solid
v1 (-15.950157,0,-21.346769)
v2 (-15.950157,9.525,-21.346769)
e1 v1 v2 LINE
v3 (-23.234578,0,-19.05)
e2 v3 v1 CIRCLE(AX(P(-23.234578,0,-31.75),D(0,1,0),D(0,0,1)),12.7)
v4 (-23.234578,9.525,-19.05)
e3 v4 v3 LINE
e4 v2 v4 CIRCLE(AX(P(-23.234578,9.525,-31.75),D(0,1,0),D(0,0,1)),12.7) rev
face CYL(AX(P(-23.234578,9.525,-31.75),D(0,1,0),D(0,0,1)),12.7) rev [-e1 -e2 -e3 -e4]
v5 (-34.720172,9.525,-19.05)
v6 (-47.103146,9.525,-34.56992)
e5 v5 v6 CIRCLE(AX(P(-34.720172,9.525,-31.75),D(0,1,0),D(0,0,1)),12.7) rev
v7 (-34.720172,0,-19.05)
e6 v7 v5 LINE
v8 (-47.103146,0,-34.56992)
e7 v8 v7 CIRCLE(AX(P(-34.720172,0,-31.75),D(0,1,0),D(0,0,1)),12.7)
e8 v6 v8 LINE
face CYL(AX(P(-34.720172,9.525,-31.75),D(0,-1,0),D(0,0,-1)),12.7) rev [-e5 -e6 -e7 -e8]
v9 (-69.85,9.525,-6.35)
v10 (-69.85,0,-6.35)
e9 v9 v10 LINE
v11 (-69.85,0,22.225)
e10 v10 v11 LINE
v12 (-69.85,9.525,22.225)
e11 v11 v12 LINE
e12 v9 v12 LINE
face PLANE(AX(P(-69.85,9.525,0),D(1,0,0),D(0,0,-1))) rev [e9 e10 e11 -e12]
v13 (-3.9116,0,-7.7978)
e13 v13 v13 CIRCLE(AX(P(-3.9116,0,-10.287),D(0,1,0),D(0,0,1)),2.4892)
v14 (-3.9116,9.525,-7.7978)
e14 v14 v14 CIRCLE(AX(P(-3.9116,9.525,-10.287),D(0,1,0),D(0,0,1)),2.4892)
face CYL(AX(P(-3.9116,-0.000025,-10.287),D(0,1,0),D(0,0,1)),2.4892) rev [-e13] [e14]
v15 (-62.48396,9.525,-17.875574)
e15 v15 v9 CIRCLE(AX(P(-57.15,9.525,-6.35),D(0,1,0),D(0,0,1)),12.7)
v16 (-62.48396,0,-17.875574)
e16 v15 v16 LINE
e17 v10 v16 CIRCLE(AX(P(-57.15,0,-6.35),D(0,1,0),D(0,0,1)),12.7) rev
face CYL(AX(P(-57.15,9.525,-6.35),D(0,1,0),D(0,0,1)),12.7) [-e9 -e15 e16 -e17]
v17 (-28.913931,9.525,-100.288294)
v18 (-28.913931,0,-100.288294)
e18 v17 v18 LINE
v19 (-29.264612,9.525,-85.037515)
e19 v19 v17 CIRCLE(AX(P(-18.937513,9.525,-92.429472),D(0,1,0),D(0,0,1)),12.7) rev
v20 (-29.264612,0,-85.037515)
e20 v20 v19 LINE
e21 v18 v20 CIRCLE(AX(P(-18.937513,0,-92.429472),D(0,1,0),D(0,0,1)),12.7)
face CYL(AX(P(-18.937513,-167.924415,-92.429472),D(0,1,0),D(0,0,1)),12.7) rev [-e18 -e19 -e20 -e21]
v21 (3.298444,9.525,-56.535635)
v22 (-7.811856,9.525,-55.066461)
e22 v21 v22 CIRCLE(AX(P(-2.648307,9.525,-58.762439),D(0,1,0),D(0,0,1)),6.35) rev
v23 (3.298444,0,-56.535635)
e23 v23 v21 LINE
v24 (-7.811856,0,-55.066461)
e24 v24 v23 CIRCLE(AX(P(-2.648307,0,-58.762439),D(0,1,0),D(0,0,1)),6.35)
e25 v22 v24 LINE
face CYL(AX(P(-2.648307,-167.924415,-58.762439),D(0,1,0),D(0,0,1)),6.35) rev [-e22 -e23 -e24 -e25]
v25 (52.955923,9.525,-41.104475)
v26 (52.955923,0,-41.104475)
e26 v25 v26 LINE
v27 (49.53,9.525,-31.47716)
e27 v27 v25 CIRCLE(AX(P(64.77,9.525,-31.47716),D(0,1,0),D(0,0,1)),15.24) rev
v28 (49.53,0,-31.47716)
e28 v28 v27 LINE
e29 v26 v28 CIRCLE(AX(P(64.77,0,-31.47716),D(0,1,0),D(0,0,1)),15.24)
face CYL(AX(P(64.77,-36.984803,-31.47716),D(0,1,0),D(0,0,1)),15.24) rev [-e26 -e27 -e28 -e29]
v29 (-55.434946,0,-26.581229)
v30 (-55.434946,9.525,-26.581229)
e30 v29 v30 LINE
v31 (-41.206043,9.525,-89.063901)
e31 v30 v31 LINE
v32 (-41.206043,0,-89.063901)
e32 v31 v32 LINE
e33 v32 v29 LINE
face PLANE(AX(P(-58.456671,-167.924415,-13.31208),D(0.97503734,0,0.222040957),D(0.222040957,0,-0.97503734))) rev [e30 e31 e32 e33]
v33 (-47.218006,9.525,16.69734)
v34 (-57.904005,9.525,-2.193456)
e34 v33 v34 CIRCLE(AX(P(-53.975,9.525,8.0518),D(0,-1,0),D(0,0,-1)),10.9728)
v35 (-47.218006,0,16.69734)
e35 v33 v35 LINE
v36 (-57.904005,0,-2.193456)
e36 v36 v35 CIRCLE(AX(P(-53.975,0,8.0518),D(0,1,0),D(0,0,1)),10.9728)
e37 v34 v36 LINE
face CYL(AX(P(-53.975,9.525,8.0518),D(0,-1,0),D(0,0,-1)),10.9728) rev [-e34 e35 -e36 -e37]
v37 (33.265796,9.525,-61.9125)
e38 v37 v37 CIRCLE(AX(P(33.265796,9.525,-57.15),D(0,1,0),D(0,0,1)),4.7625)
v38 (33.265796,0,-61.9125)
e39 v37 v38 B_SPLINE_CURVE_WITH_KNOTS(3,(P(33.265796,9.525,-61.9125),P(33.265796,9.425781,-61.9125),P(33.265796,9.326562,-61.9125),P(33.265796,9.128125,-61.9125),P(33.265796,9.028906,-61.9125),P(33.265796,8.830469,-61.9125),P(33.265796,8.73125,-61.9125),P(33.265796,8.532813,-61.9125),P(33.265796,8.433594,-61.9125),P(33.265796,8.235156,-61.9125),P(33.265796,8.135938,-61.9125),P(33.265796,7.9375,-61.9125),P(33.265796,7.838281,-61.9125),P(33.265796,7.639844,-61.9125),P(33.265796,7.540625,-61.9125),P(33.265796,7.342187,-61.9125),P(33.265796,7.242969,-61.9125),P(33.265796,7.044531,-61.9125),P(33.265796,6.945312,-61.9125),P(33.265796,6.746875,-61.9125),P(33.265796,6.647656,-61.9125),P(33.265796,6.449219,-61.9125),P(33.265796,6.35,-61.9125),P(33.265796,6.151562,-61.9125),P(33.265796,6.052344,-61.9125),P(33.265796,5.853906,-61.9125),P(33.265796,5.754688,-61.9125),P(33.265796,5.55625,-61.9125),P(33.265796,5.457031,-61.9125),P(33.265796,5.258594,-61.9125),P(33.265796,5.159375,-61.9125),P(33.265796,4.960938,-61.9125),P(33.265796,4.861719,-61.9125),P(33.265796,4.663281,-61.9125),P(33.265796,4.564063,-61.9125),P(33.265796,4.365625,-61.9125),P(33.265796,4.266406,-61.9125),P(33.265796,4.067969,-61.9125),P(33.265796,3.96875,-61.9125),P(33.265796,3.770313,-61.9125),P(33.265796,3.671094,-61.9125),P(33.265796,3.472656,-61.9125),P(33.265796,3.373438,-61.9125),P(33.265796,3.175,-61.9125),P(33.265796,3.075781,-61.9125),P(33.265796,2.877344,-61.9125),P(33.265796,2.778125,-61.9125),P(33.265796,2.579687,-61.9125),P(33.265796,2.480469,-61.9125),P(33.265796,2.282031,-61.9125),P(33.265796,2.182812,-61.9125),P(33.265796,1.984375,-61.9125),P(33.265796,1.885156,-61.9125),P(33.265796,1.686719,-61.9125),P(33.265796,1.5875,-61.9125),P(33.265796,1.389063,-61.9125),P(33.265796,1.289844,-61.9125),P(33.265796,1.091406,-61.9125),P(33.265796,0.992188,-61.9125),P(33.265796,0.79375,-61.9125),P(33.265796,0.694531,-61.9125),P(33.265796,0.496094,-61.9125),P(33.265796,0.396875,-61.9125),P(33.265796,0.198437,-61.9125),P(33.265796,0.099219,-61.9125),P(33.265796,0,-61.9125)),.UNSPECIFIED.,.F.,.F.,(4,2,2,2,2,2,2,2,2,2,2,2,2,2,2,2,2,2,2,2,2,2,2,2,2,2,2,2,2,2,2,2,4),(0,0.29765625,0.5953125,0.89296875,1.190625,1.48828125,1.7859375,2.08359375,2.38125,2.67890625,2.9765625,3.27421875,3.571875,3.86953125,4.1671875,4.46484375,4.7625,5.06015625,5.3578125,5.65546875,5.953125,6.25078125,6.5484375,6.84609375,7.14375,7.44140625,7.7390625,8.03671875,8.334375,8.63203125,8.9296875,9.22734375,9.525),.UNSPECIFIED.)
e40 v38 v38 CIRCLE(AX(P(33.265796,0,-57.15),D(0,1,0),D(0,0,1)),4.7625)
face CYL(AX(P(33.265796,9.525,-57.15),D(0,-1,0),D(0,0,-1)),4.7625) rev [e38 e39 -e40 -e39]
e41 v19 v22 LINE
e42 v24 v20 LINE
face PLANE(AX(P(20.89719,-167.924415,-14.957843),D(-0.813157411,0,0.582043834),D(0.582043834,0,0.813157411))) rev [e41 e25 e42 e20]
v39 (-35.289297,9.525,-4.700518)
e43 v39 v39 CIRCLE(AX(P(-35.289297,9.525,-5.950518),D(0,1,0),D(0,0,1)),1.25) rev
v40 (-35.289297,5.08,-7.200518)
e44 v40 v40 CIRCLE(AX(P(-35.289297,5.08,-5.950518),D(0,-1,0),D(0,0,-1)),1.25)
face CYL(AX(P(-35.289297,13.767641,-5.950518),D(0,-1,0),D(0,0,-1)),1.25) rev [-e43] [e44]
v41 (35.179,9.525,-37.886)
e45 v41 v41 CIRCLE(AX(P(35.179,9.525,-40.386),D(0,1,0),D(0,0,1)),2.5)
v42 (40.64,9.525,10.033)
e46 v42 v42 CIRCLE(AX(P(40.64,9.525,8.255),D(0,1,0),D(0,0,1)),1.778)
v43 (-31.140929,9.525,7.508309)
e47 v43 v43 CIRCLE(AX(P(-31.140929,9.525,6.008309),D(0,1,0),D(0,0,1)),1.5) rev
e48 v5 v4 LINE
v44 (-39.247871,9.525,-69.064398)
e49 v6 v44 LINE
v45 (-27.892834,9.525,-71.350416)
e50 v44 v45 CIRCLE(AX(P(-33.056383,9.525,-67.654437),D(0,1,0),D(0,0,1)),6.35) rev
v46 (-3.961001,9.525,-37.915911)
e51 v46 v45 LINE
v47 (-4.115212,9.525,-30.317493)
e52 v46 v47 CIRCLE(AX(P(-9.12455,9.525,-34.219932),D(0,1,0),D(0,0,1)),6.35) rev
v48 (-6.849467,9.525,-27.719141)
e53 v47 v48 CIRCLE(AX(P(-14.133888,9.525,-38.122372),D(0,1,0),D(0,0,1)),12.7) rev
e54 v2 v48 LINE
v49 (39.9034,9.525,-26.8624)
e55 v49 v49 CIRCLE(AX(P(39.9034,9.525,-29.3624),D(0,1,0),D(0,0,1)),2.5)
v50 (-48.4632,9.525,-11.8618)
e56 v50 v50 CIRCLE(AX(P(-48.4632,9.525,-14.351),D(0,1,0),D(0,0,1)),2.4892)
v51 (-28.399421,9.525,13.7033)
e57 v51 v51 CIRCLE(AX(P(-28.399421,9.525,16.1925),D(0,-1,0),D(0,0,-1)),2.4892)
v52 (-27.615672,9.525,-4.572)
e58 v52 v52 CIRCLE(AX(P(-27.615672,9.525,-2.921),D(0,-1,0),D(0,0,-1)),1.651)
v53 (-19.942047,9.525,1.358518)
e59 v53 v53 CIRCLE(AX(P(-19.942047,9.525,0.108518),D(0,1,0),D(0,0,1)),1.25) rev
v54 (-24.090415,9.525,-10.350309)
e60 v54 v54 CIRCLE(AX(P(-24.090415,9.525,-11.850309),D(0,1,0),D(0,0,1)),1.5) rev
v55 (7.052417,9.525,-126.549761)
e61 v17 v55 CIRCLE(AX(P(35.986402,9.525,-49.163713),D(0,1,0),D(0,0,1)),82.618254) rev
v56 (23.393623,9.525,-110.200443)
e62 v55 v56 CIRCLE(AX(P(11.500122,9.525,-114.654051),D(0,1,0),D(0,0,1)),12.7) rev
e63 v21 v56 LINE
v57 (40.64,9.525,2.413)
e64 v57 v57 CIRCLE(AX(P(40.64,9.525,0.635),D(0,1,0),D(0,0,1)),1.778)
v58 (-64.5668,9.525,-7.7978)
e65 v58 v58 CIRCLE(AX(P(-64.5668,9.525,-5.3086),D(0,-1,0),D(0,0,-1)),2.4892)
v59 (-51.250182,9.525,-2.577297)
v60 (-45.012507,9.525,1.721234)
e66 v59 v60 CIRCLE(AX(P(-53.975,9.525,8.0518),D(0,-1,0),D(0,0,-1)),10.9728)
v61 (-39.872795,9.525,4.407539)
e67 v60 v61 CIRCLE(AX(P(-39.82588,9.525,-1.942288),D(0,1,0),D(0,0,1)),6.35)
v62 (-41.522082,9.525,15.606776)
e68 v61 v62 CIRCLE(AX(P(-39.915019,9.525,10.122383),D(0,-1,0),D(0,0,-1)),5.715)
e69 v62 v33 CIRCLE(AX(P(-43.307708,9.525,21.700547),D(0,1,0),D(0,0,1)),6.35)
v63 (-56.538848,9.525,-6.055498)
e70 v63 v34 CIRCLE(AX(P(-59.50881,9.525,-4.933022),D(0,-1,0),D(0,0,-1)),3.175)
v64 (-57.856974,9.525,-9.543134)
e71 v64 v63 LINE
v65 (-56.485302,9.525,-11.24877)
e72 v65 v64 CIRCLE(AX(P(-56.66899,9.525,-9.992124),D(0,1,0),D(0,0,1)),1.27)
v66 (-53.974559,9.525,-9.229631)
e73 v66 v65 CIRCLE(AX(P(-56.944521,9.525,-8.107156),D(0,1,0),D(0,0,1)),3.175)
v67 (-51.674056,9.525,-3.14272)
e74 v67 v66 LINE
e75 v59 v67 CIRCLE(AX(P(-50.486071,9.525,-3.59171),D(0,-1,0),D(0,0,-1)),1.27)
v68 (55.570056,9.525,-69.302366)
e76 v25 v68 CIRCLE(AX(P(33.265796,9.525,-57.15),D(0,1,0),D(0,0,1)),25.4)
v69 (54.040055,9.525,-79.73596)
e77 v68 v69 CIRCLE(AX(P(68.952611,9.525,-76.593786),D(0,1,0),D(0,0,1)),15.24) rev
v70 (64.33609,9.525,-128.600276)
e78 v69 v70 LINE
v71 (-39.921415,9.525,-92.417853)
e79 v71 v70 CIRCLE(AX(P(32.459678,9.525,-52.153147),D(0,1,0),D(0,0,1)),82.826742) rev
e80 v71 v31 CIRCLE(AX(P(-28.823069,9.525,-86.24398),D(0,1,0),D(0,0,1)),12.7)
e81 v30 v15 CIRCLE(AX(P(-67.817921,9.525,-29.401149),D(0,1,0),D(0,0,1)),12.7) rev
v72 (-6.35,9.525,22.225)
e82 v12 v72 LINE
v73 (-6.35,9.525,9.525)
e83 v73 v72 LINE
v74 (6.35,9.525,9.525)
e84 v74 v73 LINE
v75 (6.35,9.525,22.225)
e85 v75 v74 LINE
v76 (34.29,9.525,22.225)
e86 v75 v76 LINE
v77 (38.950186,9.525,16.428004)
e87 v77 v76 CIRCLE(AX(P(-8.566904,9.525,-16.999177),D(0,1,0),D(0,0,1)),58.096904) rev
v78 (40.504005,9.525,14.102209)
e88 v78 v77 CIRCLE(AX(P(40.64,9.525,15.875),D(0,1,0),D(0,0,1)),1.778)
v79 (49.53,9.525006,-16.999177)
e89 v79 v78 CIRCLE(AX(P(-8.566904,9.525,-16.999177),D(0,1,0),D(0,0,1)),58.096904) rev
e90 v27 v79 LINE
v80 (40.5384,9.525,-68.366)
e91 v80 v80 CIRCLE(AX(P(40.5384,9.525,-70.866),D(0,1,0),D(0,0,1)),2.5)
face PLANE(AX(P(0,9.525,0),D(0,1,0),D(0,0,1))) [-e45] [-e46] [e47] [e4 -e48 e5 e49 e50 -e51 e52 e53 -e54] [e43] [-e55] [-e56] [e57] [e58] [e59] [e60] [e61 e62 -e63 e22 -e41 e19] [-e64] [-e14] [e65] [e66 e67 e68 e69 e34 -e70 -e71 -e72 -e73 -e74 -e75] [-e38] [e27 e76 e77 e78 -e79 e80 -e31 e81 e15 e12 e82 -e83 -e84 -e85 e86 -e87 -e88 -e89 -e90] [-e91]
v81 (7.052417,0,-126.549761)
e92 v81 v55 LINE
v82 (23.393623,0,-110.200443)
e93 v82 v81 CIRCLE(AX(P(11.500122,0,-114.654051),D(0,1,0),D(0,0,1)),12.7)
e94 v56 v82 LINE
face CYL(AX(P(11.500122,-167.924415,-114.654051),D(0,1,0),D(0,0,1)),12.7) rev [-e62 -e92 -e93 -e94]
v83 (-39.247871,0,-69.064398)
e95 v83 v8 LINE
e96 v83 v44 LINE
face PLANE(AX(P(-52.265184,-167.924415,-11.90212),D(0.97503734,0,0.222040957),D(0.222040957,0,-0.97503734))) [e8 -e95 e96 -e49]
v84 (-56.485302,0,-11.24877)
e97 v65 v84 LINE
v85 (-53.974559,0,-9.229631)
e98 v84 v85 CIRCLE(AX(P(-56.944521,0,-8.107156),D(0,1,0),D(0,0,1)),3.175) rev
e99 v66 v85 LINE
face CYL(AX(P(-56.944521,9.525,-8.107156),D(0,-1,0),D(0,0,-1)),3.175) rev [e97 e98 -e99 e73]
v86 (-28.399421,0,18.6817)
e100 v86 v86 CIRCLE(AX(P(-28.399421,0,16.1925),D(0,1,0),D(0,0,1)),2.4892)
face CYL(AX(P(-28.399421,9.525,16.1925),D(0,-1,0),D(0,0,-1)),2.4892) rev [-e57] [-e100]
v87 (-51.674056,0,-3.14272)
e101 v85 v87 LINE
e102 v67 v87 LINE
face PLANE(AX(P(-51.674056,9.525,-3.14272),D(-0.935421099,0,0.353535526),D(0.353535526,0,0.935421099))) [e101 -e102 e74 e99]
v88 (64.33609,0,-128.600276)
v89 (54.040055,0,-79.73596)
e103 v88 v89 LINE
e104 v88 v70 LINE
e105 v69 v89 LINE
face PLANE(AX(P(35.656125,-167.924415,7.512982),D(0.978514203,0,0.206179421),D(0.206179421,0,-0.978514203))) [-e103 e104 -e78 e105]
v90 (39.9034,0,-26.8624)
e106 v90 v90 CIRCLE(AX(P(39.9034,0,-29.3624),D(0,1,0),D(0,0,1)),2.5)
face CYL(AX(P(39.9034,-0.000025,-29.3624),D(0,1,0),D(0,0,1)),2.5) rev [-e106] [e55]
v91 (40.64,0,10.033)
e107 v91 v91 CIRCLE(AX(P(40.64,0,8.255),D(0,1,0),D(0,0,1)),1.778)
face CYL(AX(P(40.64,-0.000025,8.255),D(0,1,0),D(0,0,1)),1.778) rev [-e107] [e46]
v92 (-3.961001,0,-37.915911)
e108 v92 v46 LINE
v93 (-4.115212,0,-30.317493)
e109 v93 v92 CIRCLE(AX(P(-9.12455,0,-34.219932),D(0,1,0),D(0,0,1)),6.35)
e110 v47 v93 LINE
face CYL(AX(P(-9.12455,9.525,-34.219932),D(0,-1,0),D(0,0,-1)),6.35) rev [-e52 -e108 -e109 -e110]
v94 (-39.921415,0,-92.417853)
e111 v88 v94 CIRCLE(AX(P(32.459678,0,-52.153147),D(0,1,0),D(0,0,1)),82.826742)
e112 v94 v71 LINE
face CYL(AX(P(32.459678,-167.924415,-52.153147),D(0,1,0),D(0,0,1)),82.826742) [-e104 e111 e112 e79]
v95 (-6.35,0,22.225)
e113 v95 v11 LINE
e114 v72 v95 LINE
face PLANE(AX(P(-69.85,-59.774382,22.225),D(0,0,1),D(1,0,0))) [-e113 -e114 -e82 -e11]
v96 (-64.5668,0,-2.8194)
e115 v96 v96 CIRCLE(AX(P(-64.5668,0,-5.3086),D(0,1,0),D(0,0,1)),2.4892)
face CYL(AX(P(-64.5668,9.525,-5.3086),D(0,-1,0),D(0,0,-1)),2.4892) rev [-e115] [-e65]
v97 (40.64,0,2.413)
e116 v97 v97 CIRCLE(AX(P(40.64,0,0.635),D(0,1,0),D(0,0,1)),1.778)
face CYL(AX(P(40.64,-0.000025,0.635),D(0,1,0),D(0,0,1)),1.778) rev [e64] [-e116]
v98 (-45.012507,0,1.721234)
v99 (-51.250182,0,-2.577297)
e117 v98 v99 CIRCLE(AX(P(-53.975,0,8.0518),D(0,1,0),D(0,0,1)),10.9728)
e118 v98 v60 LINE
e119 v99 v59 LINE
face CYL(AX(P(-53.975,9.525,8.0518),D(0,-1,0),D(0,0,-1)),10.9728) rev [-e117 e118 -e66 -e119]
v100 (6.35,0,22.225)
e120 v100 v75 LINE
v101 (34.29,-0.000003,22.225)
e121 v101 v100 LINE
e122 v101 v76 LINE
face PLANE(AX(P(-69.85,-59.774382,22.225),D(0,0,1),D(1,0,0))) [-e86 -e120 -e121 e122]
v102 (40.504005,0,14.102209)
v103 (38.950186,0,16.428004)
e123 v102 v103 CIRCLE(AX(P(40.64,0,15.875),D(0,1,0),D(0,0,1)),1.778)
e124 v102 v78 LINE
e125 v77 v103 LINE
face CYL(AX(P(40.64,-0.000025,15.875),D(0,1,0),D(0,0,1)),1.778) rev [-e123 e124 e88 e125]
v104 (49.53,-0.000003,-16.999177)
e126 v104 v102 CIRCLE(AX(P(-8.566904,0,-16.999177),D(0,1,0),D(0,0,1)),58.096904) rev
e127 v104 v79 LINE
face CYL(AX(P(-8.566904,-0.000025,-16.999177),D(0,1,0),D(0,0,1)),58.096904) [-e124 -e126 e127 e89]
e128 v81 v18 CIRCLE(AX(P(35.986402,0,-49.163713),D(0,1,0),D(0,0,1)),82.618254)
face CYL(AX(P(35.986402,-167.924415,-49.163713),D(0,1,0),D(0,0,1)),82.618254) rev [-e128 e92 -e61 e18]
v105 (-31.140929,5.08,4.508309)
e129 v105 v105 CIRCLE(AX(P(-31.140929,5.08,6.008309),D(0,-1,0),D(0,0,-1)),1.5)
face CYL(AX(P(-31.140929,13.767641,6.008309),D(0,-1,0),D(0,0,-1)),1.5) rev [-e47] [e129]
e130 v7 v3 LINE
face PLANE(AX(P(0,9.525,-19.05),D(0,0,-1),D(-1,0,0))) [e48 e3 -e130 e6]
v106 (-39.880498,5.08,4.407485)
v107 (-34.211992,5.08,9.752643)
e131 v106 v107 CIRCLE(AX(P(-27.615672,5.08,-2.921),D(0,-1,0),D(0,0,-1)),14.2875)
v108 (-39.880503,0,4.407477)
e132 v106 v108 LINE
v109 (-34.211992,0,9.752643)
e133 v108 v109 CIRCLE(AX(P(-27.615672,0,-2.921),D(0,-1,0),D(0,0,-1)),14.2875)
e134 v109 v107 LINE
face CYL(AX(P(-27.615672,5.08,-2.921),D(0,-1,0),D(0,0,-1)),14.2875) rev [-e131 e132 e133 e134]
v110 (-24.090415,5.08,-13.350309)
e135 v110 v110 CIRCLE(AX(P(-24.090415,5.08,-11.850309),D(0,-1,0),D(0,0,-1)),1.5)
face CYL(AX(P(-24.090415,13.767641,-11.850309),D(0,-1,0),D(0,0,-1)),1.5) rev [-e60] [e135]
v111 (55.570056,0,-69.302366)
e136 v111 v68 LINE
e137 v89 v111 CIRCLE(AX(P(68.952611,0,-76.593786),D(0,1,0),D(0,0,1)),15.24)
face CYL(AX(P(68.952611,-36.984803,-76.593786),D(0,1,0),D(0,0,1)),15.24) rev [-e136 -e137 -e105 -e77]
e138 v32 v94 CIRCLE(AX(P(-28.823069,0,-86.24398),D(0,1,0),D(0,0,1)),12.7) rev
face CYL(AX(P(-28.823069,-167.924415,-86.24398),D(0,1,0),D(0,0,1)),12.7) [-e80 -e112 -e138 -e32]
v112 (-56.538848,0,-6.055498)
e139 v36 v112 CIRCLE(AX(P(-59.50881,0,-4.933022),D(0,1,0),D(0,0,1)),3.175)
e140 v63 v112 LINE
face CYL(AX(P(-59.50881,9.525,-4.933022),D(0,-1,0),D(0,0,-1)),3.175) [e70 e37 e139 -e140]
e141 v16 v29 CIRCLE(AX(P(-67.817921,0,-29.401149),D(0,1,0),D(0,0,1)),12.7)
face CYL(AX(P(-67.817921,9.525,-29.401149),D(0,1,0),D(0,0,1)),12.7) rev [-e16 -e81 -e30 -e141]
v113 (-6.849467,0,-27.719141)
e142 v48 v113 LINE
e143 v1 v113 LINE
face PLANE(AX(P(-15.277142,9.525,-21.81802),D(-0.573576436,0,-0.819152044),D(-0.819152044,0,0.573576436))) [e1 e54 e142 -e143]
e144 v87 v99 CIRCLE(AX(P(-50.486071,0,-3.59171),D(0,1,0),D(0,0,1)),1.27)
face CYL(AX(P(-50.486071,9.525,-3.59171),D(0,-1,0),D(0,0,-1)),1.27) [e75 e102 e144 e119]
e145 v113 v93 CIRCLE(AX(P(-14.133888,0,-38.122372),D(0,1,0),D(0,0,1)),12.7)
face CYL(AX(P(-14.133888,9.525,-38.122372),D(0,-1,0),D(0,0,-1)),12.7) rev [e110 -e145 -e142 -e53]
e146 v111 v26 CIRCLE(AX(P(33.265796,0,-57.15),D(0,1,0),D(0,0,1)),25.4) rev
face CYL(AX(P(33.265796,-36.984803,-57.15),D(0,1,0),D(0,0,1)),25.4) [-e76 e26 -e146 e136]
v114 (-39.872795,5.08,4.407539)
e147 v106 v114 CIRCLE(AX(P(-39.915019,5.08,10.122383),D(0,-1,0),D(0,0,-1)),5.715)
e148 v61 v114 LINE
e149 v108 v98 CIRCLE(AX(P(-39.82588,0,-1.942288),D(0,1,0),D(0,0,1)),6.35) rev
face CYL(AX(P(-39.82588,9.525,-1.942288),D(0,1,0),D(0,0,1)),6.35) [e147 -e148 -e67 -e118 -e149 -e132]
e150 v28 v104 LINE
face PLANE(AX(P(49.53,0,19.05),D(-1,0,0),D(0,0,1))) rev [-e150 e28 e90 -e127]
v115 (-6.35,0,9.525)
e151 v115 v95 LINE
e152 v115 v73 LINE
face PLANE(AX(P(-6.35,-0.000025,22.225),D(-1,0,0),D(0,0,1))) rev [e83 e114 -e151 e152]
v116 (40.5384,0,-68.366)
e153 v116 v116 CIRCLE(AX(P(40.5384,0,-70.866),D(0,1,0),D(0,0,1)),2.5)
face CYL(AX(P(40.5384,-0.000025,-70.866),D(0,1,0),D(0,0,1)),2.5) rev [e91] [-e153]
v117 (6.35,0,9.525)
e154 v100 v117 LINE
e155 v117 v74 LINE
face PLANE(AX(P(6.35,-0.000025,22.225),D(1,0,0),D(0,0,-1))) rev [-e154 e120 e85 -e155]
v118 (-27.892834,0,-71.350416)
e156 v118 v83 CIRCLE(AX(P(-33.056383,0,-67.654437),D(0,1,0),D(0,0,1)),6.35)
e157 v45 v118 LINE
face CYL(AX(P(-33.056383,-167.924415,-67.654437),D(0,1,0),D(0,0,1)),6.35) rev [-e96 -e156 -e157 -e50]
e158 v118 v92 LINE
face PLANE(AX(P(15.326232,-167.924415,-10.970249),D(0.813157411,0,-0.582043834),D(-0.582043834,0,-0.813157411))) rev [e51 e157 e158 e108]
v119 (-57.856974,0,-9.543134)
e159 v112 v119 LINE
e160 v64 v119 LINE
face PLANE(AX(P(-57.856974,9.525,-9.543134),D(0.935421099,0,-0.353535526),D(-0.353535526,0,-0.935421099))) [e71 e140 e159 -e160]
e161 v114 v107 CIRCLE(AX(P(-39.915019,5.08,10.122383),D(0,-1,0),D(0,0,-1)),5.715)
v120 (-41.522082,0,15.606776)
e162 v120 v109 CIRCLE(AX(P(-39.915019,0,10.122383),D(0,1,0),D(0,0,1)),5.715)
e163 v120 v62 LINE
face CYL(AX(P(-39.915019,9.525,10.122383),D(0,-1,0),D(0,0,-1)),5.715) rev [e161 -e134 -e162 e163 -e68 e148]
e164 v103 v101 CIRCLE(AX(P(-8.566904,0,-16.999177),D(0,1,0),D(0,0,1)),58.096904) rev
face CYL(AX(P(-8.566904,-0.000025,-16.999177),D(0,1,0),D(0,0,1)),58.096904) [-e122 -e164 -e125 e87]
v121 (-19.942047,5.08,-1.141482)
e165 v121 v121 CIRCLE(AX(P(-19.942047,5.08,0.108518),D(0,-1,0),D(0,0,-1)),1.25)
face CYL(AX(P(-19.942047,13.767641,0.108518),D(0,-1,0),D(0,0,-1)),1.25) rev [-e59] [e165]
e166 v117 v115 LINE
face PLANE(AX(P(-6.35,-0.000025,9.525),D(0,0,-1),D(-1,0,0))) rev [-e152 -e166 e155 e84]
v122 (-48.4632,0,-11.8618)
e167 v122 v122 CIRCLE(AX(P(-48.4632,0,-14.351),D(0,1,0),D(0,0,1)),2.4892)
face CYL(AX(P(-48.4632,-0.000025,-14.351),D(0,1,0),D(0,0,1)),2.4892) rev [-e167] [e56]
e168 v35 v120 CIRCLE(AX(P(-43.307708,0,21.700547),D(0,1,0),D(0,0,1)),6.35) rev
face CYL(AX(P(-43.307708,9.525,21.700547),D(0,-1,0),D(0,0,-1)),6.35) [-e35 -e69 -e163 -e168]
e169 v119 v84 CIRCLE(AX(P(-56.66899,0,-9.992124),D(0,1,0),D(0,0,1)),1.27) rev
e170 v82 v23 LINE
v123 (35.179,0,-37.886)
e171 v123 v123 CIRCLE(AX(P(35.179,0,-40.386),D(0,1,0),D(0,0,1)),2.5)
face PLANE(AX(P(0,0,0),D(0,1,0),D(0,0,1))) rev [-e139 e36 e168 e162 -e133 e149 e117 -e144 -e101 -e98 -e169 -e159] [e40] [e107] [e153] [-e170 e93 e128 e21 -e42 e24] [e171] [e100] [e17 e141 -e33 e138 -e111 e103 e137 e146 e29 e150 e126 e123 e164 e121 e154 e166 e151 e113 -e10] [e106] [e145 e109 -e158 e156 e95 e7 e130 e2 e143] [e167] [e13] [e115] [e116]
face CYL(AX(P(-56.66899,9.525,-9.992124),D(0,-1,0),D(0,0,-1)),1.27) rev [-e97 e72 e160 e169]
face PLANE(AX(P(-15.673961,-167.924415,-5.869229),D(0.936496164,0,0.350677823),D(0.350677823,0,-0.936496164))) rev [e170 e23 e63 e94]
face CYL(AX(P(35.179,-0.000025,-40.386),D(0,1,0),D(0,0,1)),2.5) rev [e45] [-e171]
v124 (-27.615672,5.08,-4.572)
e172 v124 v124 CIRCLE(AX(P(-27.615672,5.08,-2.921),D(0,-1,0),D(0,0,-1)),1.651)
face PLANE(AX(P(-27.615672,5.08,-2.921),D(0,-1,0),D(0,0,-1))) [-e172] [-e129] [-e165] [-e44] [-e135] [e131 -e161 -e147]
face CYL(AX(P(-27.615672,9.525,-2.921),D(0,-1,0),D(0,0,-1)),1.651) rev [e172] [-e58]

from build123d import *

# Parameters (mm, degrees)
SKETCH1_R                = 4.7625
SKETCH1_W                = 139.7
SKETCH1_H                = 38.1
BOSS_EXTRUDE1_DEPTH      = 9.525
CUT_EXTRUDE4_DEPTH       = 106.62050594
CUT_EXTRUDE4_DEPTH_BACK  = 106.62050594
SKETCH5_W                = 20.32
SKETCH5_H                = 77.381530754
FILLET9_R                = 12.7
BOSS_EXTRUDE4_DEPTH      = 9.525
CUT_EXTRUDE3_DEPTH       = 153.280394257
CUT_EXTRUDE3_DEPTH_BACK  = 153.280394257
SKETCH4_R                = 10.9728
FILLET13_R               = 12.7
FILLET14_R               = 6.35
CUT_EXTRUDE5_DEPTH       = 153.280394397
CUT_EXTRUDE5_DEPTH_BACK  = 153.280394397
SKETCH7_W                = 12.7
SKETCH7_H                = 6.35
FILLET15_R               = 1.27
SKETCH8_W                = 59.69
SKETCH8_H                = 3.175
SKETCH8_W_2              = 12.7
BOSS_EXTRUDE5_DEPTH      = 9.525
SKETCH9_R                = 14.2875
CUT_EXTRUDE6_DEPTH       = 5.08
CUT_EXTRUDE7_DEPTH       = 153.067088129
CUT_EXTRUDE7_DEPTH_BACK  = 153.067088129
SKETCH10_R               = 1.651
BOSS_EXTRUDE6_START      = -9.525
BOSS_EXTRUDE6_DEPTH      = 9.525
FILLET16_R               = 15.24
SKETCH12_R               = 1.5
SKETCH12_R_2             = 1.25
CUT_EXTRUDE8_DEPTH       = 4.445
CUT_EXTRUDE10_DEPTH      = 153.280394397
CUT_EXTRUDE10_DEPTH_BACK = 153.280394397
SKETCH13_R               = 2.4892
SKETCH13_R_2             = 5.715
FILLET18_R               = 6.35
CUT_EXTRUDE11_DEPTH      = 153.280394397
CUT_EXTRUDE11_DEPTH_BACK = 153.280394397
SKETCH15_R               = 2.5
BOSS_EXTRUDE7_DEPTH      = 9.525
CUT_EXTRUDE12_DEPTH      = 153.280394397
CUT_EXTRUDE12_DEPTH_BACK = 153.280394397
SKETCH19_R               = 2.4892
BOSS_EXTRUDE8_DEPTH      = 9.525
SKETCH22_R               = 2.4892
BOSS_EXTRUDE9_DEPTH      = 9.525
CUT_EXTRUDE13_DEPTH      = 153.280394397
CUT_EXTRUDE13_DEPTH_BACK = 153.280394397
SKETCH23_R               = 2.4892
BOSS_EXTRUDE10_DEPTH     = 9.525
BOSS_EXTRUDE11_START     = -9.525
SKETCH26_R               = 2.4892
BOSS_EXTRUDE11_DEPTH     = 9.525
CUT_EXTRUDE14_DEPTH      = 153.280394397
CUT_EXTRUDE14_DEPTH_BACK = 153.280394397
SKETCH25_R               = 2.4892
SKETCH27_W               = 46.99
SKETCH27_H               = 3.175
BOSS_EXTRUDE12_DEPTH     = 9.525
CUT_EXTRUDE15_DEPTH      = 153.280394397
CUT_EXTRUDE15_DEPTH_BACK = 153.280394397
SKETCH28_R               = 1.778
CUT_EXTRUDE16_DEPTH      = 153.280394397
CUT_EXTRUDE16_DEPTH_BACK = 153.280394397
SKETCH29_W               = 12.7
SKETCH29_H               = 12.7
CUT_EXTRUDE17_DEPTH      = 153.280394397
CUT_EXTRUDE17_DEPTH_BACK = 153.280394397


with BuildPart() as part:
    # Sketch1 → Boss-Extrude1 (new body)
    # profile 1 of 2: a face of its own
    with BuildSketch(Plane(origin=(0, 0, 0), x_dir=(1, 0, 0), z_dir=(0, 1, 0))):
        with BuildLine():
            Line((-2.585114067, 30.705073187), (-19.230283607, 19.05))
            Line((-19.230283607, 19.05), (65.876676898, 19.05))
            Line((65.876676898, 19.05), (45.762611627, 67.384672451))
            Line((45.762611627, 67.384672451), (47.126806193, 73.586403918))
            ThreePointArc((47.126806193, 73.586403918), (27.684344017, 77.91367928), (13.031924758, 64.421412702))
            Line((13.031924758, 64.421412702), (0.786820794, 49.82826606))
            Line((0.786820794, 49.82826606), (-2.585114067, 30.705073187))
        make_face()
        with Locations(Location((33.265795842, 57.15, 0), (0, 0, 90))):
            Circle(SKETCH1_R, mode=Mode.SUBTRACT)
    # profile 2 of 2: a face of its own
    with BuildSketch(Plane(origin=(0, 0, 0), x_dir=(1, 0, 0), z_dir=(0, 1, 0))):
        Rectangle(SKETCH1_W, SKETCH1_H)
    extrude(amount=BOSS_EXTRUDE1_DEPTH)

    # Sketch5 → Cut-Extrude4 (cut, two sides: drawn at the far end of the back side and taken through both)
    with BuildSketch(Plane(origin=(0, 9.525, 0), x_dir=(1, 0, 0), z_dir=(0, 1, 0)).offset(-CUT_EXTRUDE4_DEPTH_BACK)):
        with Locations((59.69, 19.640765377)):
            Rectangle(SKETCH5_W, SKETCH5_H)
    extrude(amount=CUT_EXTRUDE4_DEPTH + CUT_EXTRUDE4_DEPTH_BACK, mode=Mode.SUBTRACT)

    # Fillet9
    fillet9_edges = [part.edges().sort_by_distance(p)[0] for p in [
        (-69.85, 4.7625, -19.05),
    ]]
    fillet(fillet9_edges, radius=FILLET9_R)

    # Sketch6 → Boss-Extrude4 (add)
    with BuildSketch(Plane(origin=(0, 9.525, 0), x_dir=(1, 0, 0), z_dir=(0, 1, 0))):
        with BuildLine():
            Line((-40.820324649, 90.757686087), (-57.15, 19.05))
            Line((-57.15, 19.05), (-50.637428899, 19.05))
            Line((-50.637428899, 19.05), (-36.112276852, 82.833573217))
            Line((-36.112276852, 82.833573217), (-1.836902529, 34.948391683))
            Line((-1.836902529, 34.948391683), (-0.1716456, 44.392533029))
            Line((-0.1716456, 44.392533029), (-34.470324649, 92.310272954))
            ThreePointArc((-34.470324649, 92.310272954), (-6.367424053, 120.099806777), (31.427854219, 131.656110351))
            Line((31.427854219, 131.656110351), (0.786820794, 49.82826606))
            Line((0.786820794, 49.82826606), (13.031924758, 64.421412702))
            Line((13.031924758, 64.421412702), (38.768247431, 133.151072535))
            ThreePointArc((38.768247431, 133.151072535), (49.726444557, 129.989338268), (58.105148392, 122.251381827))
            Line((58.105148392, 122.251381827), (46.378042741, 65.905773934))
            Line((46.378042741, 65.905773934), (49.53, 58.331530754))
            Line((49.53, 58.331530754), (64.336089791, 128.600275766))
            ThreePointArc((64.336089791, 128.600275766), (4.413649104, 130.087025535), (-40.820324649, 90.757686087))
        make_face()
    extrude(amount=-BOSS_EXTRUDE4_DEPTH)

    # Sketch4 → Cut-Extrude3 (cut, two sides: drawn at the far end of the back side and taken through both)
    with BuildSketch(Plane(origin=(0, 0, 0), x_dir=(-1, 0, 0), z_dir=(0, -1, 0)).offset(-CUT_EXTRUDE3_DEPTH_BACK)):
        with Locations(Location((53.975, -8.0518, 0), (0, 0, 90))):
            Circle(SKETCH4_R)
    extrude(amount=CUT_EXTRUDE3_DEPTH + CUT_EXTRUDE3_DEPTH_BACK, mode=Mode.SUBTRACT)

    # Fillet13
    # the kernel refuses this fillet: 12.7 mm, written as the material it adds along each edge
    with BuildSketch(Plane(origin=(-57.15, 0, -19.05), x_dir=(-0.976607789728772, 0, 0.2150284284486181), z_dir=(0, 1, 0))) as fillet13_piece_1:
        with BuildLine():
            CenterArc((8.192583124, -12.40291893), FILLET13_R, 102.417195144, 52.336673181)
            Line((-3.294362955, -6.986271462), (0, 0))
            ThreePointArc((0, 0), (2.730861041, -0.29708107), (5.461722083, 0))
        make_face()
    extrude(amount=9.525)
    with BuildSketch(Plane(origin=(-50.637428899, 9.525, -19.05), x_dir=(0.22204095655633652, 0, -0.9750373395986162), z_dir=(0, -1, 0))) as fillet13_piece_2:
        with BuildLine():
            CenterArc((FILLET13_R * 1.25332734135, FILLET13_R), FILLET13_R, 167.17106347, 102.82893653)
            Line((FILLET13_R * 0.278290001752, FILLET13_R * 1.22204095656), (0, 0))
            Line((0, 0), (FILLET13_R * 1.25332734135, 0))
        make_face()
    extrude(amount=9.525)
    with BuildSketch(Plane(origin=(-19.230283607, 0, -19.05), x_dir=(0.8191520442889918, 0, -0.5735764363510462), z_dir=(0, 1, 0))) as fillet13_piece_3:
        with BuildLine():
            CenterArc((FILLET13_R * 0.315298788879, FILLET13_R), FILLET13_R, 235, 35)
            Line((-FILLET13_R * 0.258277647472, FILLET13_R * 0.180847955711), (0, 0))
            Line((0, 0), (FILLET13_R * 0.315298788879, 0))
        make_face()
    extrude(amount=9.525)
    with BuildSketch(Plane(origin=(-2.585114067, 0, -30.705073187), x_dir=(0.17364817766692484, 0, -0.9848077530122089), z_dir=(0, 1, 0))) as fillet13_piece_4:
        with BuildLine():
            CenterArc((5.299189821, 12.661322422), FILLET13_R, 225, 40.527239041)
            Line((-3.681066301, 3.681066301), (0, 0))
            Line((0, 0), (4.308778524, 0))
        make_face()
    extrude(amount=9.525)
    with BuildSketch(Plane(origin=(-0.1716456, 9.525, -44.392533029), x_dir=(0.17364817766692364, 0, -0.9848077530122092), z_dir=(0, -1, 0))) as fillet13_piece_5:
        with BuildLine():
            CenterArc((18.211827751, -0.443902553), FILLET13_R, 177.996935086, 46.408641112)
            Line((9.138889548, -9.330510025), (0, 0))
            Line((0, 0), (5.519587975, 0))
        make_face()
    extrude(amount=9.525)
    with BuildSketch(Plane(origin=(-34.470324649, 9.525, -92.310272954), x_dir=(0.582043833980417, 0, 0.8131574111605802), z_dir=(0, -1, 0))) as fillet13_piece_6:
        with BuildLine():
            CenterArc((8.943849896, -12.7), FILLET13_R, 90, 73.823338331)
            ThreePointArc((-3.25332215, -9.161780942), (-1.76154416, -4.532993874), (0, 0))
            Line((0, 0), (8.943849896, 0))
        make_face()
    extrude(amount=9.525)
    with BuildSketch(Plane(origin=(31.427854219, 9.525, -131.656110351), x_dir=(-0.35067782252306107, 0, 0.9364961637884506), z_dir=(0, -1, 0))) as fillet13_piece_7:
        with BuildLine():
            CenterArc((22.910577069, 12.7), FILLET13_R, 138.970878113, 131.029121887)
            ThreePointArc((13.330001541, 21.036820291), (5.867776411, 11.023572133), (0, 0))
            Line((0, 0), (22.910577069, 0))
        make_face()
    extrude(amount=9.525)
    with BuildSketch(Plane(origin=(38.768247431, 9.525, -133.151072535), x_dir=(0.9114378000140282, 0, 0.4114378892440367), z_dir=(0, -1, 0))) as fillet13_piece_8:
        with BuildLine():
            CenterArc((13.505287969, 11.815048757), FILLET13_R, 176.233586555, 115.281848771)
            Line((0.83271811, 12.649298827), (0, 0))
            ThreePointArc((0, 0), (9.08151833, -1.725447521), (18.163036659, 0))
        make_face()
    extrude(amount=9.525)
    with BuildSketch(Plane(origin=(58.105148392, 9.525, -122.251381827), x_dir=(-0.20376170284526773, 0, 0.9790205148277521), z_dir=(0, -1, 0))) as fillet13_piece_9:
        with BuildLine():
            CenterArc((6.572505314, 12.7), FILLET13_R, 202.357643181, 67.642356819)
            ThreePointArc((-5.172803851, 7.869087807), (-2.96392391, 3.686376997), (0, 0))
            Line((0, 0), (6.572505314, 0))
        make_face()
    extrude(amount=9.525)
    with BuildSketch(Plane(origin=(46.378042741, 9.525, -65.905773934), x_dir=(-0.3842022467121058, 0, -0.9232489553860163), z_dir=(0, -1, 0))) as fillet13_piece_10:
        with BuildLine():
            CenterArc((12.142765771, -7.083707791), FILLET13_R, 124.351243604, 21.746881653)
            Line((4.976604581, 3.401335546), (0, 0))
            Line((0, 0), (1.601841527, 0))
        make_face()
    extrude(amount=9.525)
    with BuildSketch(Plane(origin=(49.53, 9.525, -58.331530754), x_dir=(0, 0, 1), z_dir=(0, -1, 0))) as fillet13_piece_11:
        with BuildLine():
            CenterArc((FILLET13_R * 0.104209219527, -FILLET13_R), FILLET13_R, 90, 11.898549943)
            Line((-FILLET13_R * 0.101970201439, -FILLET13_R * 0.0214857965414), (0, 0))
            Line((0, 0), (FILLET13_R * 0.104209219527, 0))
        make_face()
    extrude(amount=9.525)
    # the kernel refuses this fillet: 12.7 mm, written as the material it takes off along each edge
    with BuildSketch(Plane(origin=(47.126806193, -37.591362954, -73.586403918), x_dir=(-0.21483378988048846, 0, 0.9766506246993272), z_dir=(0, 1, 0))) as fillet13_2_piece_1:
        with BuildLine():
            CenterArc((10.462171267, -12.015824877), FILLET13_R, 108.892466087, 84.306815738)
            ThreePointArc((-1.902317149, -14.915725945), (-2.297569948, -7.286144783), (0, 0))
            Line((0, 0), (6.35, 0))
        make_face()
    extrude(amount=84.707725907, mode=Mode.SUBTRACT)
    with BuildSketch(Plane(origin=(-40.820324649, 14.244767821, -90.757686087), x_dir=(-0.22204095655633999, 0, 0.9750373395986153), z_dir=(0, -1, 0))) as fillet13_2_piece_2:
        with BuildLine():
            CenterArc((1.737149391, -12.7), FILLET13_R, 90, 16.257709838)
            ThreePointArc((-1.818319721, -0.50784517), (-0.91060685, -0.248741695), (0, 0))
            Line((0, 0), (1.737149391, 0))
        make_face()
    extrude(amount=18.964535642, mode=Mode.SUBTRACT)

    # Fillet14
    fillet14_edges = [part.edges().sort_by_distance(p)[0] for p in [
        (0.786820794, 4.7625, -49.82826606),
        (-1.836902529, 4.7625, -34.948391683),
        (-36.112276852, 4.7625, -82.833573217),
        (13.23245619, 4.7625, -64.956938204),
        (45.762611627, 4.7625, -67.384672451),
    ]]
    fillet(fillet14_edges, radius=FILLET14_R)

    # Sketch7 → Cut-Extrude5 (cut, two sides: drawn at the far end of the back side and taken through both)
    with BuildSketch(Plane(origin=(0, 0, 0), x_dir=(-1, 0, 0), z_dir=(0, -1, 0)).offset(-CUT_EXTRUDE5_DEPTH_BACK)):
        with Locations((10.16, -15.875)):
            Rectangle(SKETCH7_W, SKETCH7_H)
    extrude(amount=CUT_EXTRUDE5_DEPTH + CUT_EXTRUDE5_DEPTH_BACK, mode=Mode.SUBTRACT)

    # Fillet15
    fillet15_edges = [part.edges().sort_by_distance(p)[0] for p in [
        (-3.81, 4.7625, 19.05),
    ]]
    fillet(fillet15_edges, radius=FILLET15_R)

    # Sketch8 → Boss-Extrude5 (add)
    with BuildSketch(Plane(origin=(0, 9.525, 0), x_dir=(1, 0, 0), z_dir=(0, 1, 0))):
        with Locations((-40.005, -20.6375)):
            Rectangle(SKETCH8_W, SKETCH8_H)
        with Locations((8.89, -20.6375)):
            Rectangle(SKETCH8_W_2, SKETCH8_H)
    extrude(amount=-BOSS_EXTRUDE5_DEPTH)

    # Sketch9 → Cut-Extrude6 (cut)
    with BuildSketch(Plane.XZ):
        with Locations(Location((-27.615671871, -2.921, 0), (0, 0, 270))):
            Circle(SKETCH9_R)
    extrude(amount=-CUT_EXTRUDE6_DEPTH, mode=Mode.SUBTRACT)

    # Sketch10 → Cut-Extrude7 (cut, two sides: drawn at the far end of the back side and taken through both)
    with BuildSketch(Plane(origin=(0, 5.08, 0), x_dir=(-1, 0, 0), z_dir=(0, -1, 0)).offset(-CUT_EXTRUDE7_DEPTH_BACK)):
        with Locations(Location((27.615671871, 2.921, 0), (0, 0, 90))):
            Circle(SKETCH10_R)
    extrude(amount=CUT_EXTRUDE7_DEPTH + CUT_EXTRUDE7_DEPTH_BACK, mode=Mode.SUBTRACT)

    # Sketch11 → Boss-Extrude6 (add)
    with BuildSketch(Plane(origin=(0, 9.525, 0), x_dir=(1, 0, 0), z_dir=(0, 1, 0)).offset(BOSS_EXTRUDE6_START)):
        with BuildLine():
            ThreePointArc((58.665795842, 57.15), (57.133538631, 65.838547299), (52.721634096, 73.478819853))
            Line((52.721634096, 73.478819853), (49.802869616, 59.626552312))
            ThreePointArc((49.802869616, 59.626552312), (49.598401608, 58.324402676), (49.53, 57.008073666))
            Line((49.53, 57.008073666), (49.53, 37.640113709))
            ThreePointArc((49.53, 37.640113709), (56.268738975, 46.378528086), (58.665795842, 57.15))
        make_face()
    extrude(amount=BOSS_EXTRUDE6_DEPTH)

    # Fillet16
    fillet16_edges = [part.edges().sort_by_distance(p)[0] for p in [
        (49.53, 4.7625, -37.640113709),
        (52.721634096, 4.7625, -73.478819853),
    ]]
    fillet(fillet16_edges, radius=FILLET16_R)

    # Sketch12 → Cut-Extrude8 (cut)
    with BuildSketch(Plane.XZ.offset(-5.08)):
        with Locations(Location((-24.090415029, -11.850309279, 0), (0, 0, 270))):
            Circle(SKETCH12_R)
        with Locations(Location((-35.289297033, -5.950517598, 0), (0, 0, 270))):
            Circle(SKETCH12_R_2)
        with Locations(Location((-31.140928712, 6.008309279, 0), (0, 0, 270))):
            Circle(SKETCH12_R)
        with Locations(Location((-19.942046709, 0.108517598, 0), (0, 0, 270))):
            Circle(SKETCH12_R_2)
    extrude(amount=-CUT_EXTRUDE8_DEPTH, mode=Mode.SUBTRACT)

    # Sketch13 → Cut-Extrude10 (cut, two sides: drawn at the far end of the back side and taken through both)
    with BuildSketch(Plane(origin=(0, 0, 0), x_dir=(-1, 0, 0), z_dir=(0, -1, 0)).offset(-CUT_EXTRUDE10_DEPTH_BACK)):
        with Locations(Location((28.399421405, -16.1925, 0), (0, 0, 90))):
            Circle(SKETCH13_R)
        with Locations(Location((64.5668, 5.3086, 0), (0, 0, 90))):
            Circle(SKETCH13_R)
        with Locations((39.915018784, -10.122382764)):
            Circle(SKETCH13_R_2)
        with BuildLine():
            Line((51.674055679, 3.142720043), (53.974558887, 9.229630913))
            ThreePointArc((53.974558887, 9.229630913), (54.954784391, 10.581337042), (56.485302046, 11.24877034))
            ThreePointArc((56.485302046, 11.24877034), (57.658662148, 10.788019044), (57.856974373, 9.543134332))
            Line((57.856974373, 9.543134332), (56.538847729, 6.055497642))
            ThreePointArc((56.538847729, 6.055497642), (56.592853979, 3.676906453), (58.284268241, 2.003666927))
            Line((58.284268241, 2.003666927), (50.856006778, 2.376783236))
            ThreePointArc((50.856006778, 2.376783236), (51.354082414, 2.664641672), (51.674055679, 3.142720043))
        make_face()
    extrude(amount=CUT_EXTRUDE10_DEPTH + CUT_EXTRUDE10_DEPTH_BACK, mode=Mode.SUBTRACT)

    # Fillet18
    fillet18_edges = [part.edges().sort_by_distance(p)[0] for p in [
        (-43.299001495, 4.7625, 5.516963563),
        (-44.483000869, 4.7625, 13.556733455),
    ]]
    fillet(fillet18_edges, radius=FILLET18_R)

    # Sketch15 → Cut-Extrude11 (cut, two sides: drawn at the far end of the back side and taken through both)
    with BuildSketch(Plane(origin=(0, 9.525, 0), x_dir=(1, 0, 0), z_dir=(0, 1, 0)).offset(-CUT_EXTRUDE11_DEPTH_BACK)):
        with Locations(Location((40.5384, 70.866, 0), (0, 0, 270))):
            Circle(SKETCH15_R)
        with Locations(Location((35.179, 40.386, 0), (0, 0, 270))):
            Circle(SKETCH15_R)
        with Locations(Location((39.9034, 29.3624, 0), (0, 0, 270))):
            Circle(SKETCH15_R)
    extrude(amount=CUT_EXTRUDE11_DEPTH + CUT_EXTRUDE11_DEPTH_BACK, mode=Mode.SUBTRACT)

    # Sketch16 → Boss-Extrude7 (add)
    with BuildSketch(Plane(origin=(0, 9.525, 0), x_dir=(1, 0, 0), z_dir=(0, 1, 0))):
        Polygon((55.88, -6.35), (49.53, -12.7), (49.53, -19.05), (55.88, -19.05), (55.88, -15.875), (53.680295474, -17.145), (53.680295474, -10.795), (55.88, -12.065), align=None)
    extrude(amount=-BOSS_EXTRUDE7_DEPTH)

    # Sketch19 → Cut-Extrude12 (cut, two sides: drawn at the far end of the back side and taken through both)
    with BuildSketch(Plane(origin=(0, 9.525, 0), x_dir=(-1, 0, 0), z_dir=(0, 1, 0)).offset(-CUT_EXTRUDE12_DEPTH_BACK)):
        with Locations(Location((48.4632, -14.351, 0), (0, 0, 90))):
            Circle(SKETCH19_R)
        with Locations(Location((3.9116, -10.287, 0), (0, 0, 90))):
            Circle(SKETCH19_R)
    extrude(amount=CUT_EXTRUDE12_DEPTH + CUT_EXTRUDE12_DEPTH_BACK, mode=Mode.SUBTRACT)

    # Sketch20 → Boss-Extrude8 (add)
    with BuildSketch(Plane(origin=(0, 9.525, 0), x_dir=(1, 0, 0), z_dir=(0, 1, 0))):
        with BuildLine():
            Line((56.765923517, 115.816764291), (49.477471597, 80.79770108))
            ThreePointArc((49.477471597, 80.79770108), (45.750277632, 76.249973388), (39.888432691, 76.711032933))
            ThreePointArc((39.888432691, 76.711032933), (36.568151291, 78.179584032), (32.968035134, 78.648705083))
            Line((32.968035134, 78.648705083), (28.640469351, 78.147364991))
            ThreePointArc((28.640469351, 78.147364991), (22.478176253, 80.187150695), (21.327682643, 86.575495269))
            Line((21.327682643, 86.575495269), (34.322817384, 121.279411659))
            ThreePointArc((34.322817384, 121.279411659), (42.390819167, 128.935945905), (53.393115193, 127.303569849))
            ThreePointArc((53.393115193, 127.303569849), (56.517930083, 121.9825198), (56.765923517, 115.816764291))
        make_face()
    extrude(amount=-BOSS_EXTRUDE8_DEPTH)

    # Sketch22 → Boss-Extrude9 (add)
    with BuildSketch(Plane(origin=(0, 9.525, 0), x_dir=(1, 0, 0), z_dir=(0, 1, 0))):
        Polygon((62.23, 2.521193519), (49.53, -1.837516354), (49.53, -19.05), (62.23, -19.05), align=None)
        with Locations((54.129270233, -12.673767621)):
            Circle(SKETCH22_R, mode=Mode.SUBTRACT)
    extrude(amount=-BOSS_EXTRUDE9_DEPTH)

    # Sketch23 → Cut-Extrude13 (cut, two sides: drawn at the far end of the back side and taken through both)
    with BuildSketch(Plane(origin=(0, 9.525, 0), x_dir=(1, 0, 0), z_dir=(0, 1, 0)).offset(-CUT_EXTRUDE13_DEPTH_BACK)):
        with Locations(Location((54.129270233, -12.673767621, 0), (0, 0, 270))):
            Circle(SKETCH23_R)
    extrude(amount=CUT_EXTRUDE13_DEPTH + CUT_EXTRUDE13_DEPTH_BACK, mode=Mode.SUBTRACT)

    # Sketch24 → Boss-Extrude10 (add)
    with BuildSketch(Plane(origin=(0, 0, 0), x_dir=(-1, 0, 0), z_dir=(0, -1, 0))):
        Polygon((-62.23, -1.837516354), (-49.53, -1.837516354), (-49.53, 2.521193519), align=None)
    extrude(amount=-BOSS_EXTRUDE10_DEPTH)

    # Sketch26 → Boss-Extrude11 (add)
    with BuildSketch(Plane(origin=(0, 0, 0), x_dir=(-1, 0, 0), z_dir=(0, -1, 0)).offset(BOSS_EXTRUDE11_START)):
        with Locations((-54.129270233, -12.673767621)):
            Circle(SKETCH26_R)
    extrude(amount=BOSS_EXTRUDE11_DEPTH)

    # Sketch25 → Cut-Extrude14 (cut, two sides: drawn at the far end of the back side and taken through both)
    with BuildSketch(Plane(origin=(0, 0, 0), x_dir=(-1, 0, 0), z_dir=(0, -1, 0)).offset(-CUT_EXTRUDE14_DEPTH_BACK)):
        with Locations(Location((-57.630729767, -12.673767621, 0), (0, 0, 90))):
            Circle(SKETCH25_R)
        Polygon((-62.23, -1.837516354), (-55.88, 0.341838583), (-62.23, 2.521193519), align=None)
    extrude(amount=CUT_EXTRUDE14_DEPTH + CUT_EXTRUDE14_DEPTH_BACK, mode=Mode.SUBTRACT)

    # Sketch27 → Boss-Extrude12 (add)
    with BuildSketch(Plane(origin=(0, 9.525, 0), x_dir=(1, 0, 0), z_dir=(0, 1, 0))):
        with BuildLine():
            Line((-16.51, -12.7), (-16.51, -19.05))
            Line((-16.51, -19.05), (-10.16, -19.05))
            Line((-10.16, -19.05), (-10.16, -22.225))
            Line((-10.16, -22.225), (2.54, -22.225))
            Line((2.54, -22.225), (2.54, -19.05))
            Line((2.54, -19.05), (-2.54, -19.05))
            ThreePointArc((-2.54, -19.05), (-3.438025612, -18.678025612), (-3.81, -17.78))
            Line((-3.81, -17.78), (-3.81, -12.7))
            Line((-3.81, -12.7), (-16.51, -12.7))
        make_face()
        with Locations((38.735, -20.6375)):
            Rectangle(SKETCH27_W, SKETCH27_H)
    extrude(amount=-BOSS_EXTRUDE12_DEPTH)

    # Sketch28 → Cut-Extrude15 (cut, two sides: drawn at the far end of the back side and taken through both)
    with BuildSketch(Plane(origin=(0, 9.525, 0), x_dir=(1, 0, 0), z_dir=(0, 1, 0)).offset(-CUT_EXTRUDE15_DEPTH_BACK)):
        with Locations(Location((40.64, -8.255, 0), (0, 0, 270))):
            Circle(SKETCH28_R)
        with Locations(Location((40.64, -15.875, 0), (0, 0, 270))):
            Circle(SKETCH28_R)
        with Locations(Location((40.64, -0.635, 0), (0, 0, 270))):
            Circle(SKETCH28_R)
    extrude(amount=CUT_EXTRUDE15_DEPTH + CUT_EXTRUDE15_DEPTH_BACK, mode=Mode.SUBTRACT)

    # Sketch29 → Cut-Extrude16 (cut, two sides: drawn at the far end of the back side and taken through both)
    with BuildSketch(Plane(origin=(0, 9.525, 0), x_dir=(1, 0, 0), z_dir=(0, 1, 0)).offset(-CUT_EXTRUDE16_DEPTH_BACK)):
        with Locations((0, -15.875)):
            Rectangle(SKETCH29_W, SKETCH29_H)
    extrude(amount=CUT_EXTRUDE16_DEPTH + CUT_EXTRUDE16_DEPTH_BACK, mode=Mode.SUBTRACT)

    # Sketch30 → Cut-Extrude17 (cut, two sides: drawn at the far end of the back side and taken through both)
    with BuildSketch(Plane(origin=(0, 9.525, 0), x_dir=(1, 0, 0), z_dir=(0, 1, 0)).offset(-CUT_EXTRUDE17_DEPTH_BACK)):
        with BuildLine():
            Line((34.29, -22.225), (62.23, -22.225))
            Line((62.23, -22.225), (62.23, 16.999176694))
            Line((62.23, 16.999176694), (49.53, 16.999176694))
            ThreePointArc((49.53, 16.999176694), (45.586136967, -4.041222763), (34.29, -22.225))
        make_face()
    extrude(amount=CUT_EXTRUDE17_DEPTH + CUT_EXTRUDE17_DEPTH_BACK, mode=Mode.SUBTRACT)


solid = part.part
